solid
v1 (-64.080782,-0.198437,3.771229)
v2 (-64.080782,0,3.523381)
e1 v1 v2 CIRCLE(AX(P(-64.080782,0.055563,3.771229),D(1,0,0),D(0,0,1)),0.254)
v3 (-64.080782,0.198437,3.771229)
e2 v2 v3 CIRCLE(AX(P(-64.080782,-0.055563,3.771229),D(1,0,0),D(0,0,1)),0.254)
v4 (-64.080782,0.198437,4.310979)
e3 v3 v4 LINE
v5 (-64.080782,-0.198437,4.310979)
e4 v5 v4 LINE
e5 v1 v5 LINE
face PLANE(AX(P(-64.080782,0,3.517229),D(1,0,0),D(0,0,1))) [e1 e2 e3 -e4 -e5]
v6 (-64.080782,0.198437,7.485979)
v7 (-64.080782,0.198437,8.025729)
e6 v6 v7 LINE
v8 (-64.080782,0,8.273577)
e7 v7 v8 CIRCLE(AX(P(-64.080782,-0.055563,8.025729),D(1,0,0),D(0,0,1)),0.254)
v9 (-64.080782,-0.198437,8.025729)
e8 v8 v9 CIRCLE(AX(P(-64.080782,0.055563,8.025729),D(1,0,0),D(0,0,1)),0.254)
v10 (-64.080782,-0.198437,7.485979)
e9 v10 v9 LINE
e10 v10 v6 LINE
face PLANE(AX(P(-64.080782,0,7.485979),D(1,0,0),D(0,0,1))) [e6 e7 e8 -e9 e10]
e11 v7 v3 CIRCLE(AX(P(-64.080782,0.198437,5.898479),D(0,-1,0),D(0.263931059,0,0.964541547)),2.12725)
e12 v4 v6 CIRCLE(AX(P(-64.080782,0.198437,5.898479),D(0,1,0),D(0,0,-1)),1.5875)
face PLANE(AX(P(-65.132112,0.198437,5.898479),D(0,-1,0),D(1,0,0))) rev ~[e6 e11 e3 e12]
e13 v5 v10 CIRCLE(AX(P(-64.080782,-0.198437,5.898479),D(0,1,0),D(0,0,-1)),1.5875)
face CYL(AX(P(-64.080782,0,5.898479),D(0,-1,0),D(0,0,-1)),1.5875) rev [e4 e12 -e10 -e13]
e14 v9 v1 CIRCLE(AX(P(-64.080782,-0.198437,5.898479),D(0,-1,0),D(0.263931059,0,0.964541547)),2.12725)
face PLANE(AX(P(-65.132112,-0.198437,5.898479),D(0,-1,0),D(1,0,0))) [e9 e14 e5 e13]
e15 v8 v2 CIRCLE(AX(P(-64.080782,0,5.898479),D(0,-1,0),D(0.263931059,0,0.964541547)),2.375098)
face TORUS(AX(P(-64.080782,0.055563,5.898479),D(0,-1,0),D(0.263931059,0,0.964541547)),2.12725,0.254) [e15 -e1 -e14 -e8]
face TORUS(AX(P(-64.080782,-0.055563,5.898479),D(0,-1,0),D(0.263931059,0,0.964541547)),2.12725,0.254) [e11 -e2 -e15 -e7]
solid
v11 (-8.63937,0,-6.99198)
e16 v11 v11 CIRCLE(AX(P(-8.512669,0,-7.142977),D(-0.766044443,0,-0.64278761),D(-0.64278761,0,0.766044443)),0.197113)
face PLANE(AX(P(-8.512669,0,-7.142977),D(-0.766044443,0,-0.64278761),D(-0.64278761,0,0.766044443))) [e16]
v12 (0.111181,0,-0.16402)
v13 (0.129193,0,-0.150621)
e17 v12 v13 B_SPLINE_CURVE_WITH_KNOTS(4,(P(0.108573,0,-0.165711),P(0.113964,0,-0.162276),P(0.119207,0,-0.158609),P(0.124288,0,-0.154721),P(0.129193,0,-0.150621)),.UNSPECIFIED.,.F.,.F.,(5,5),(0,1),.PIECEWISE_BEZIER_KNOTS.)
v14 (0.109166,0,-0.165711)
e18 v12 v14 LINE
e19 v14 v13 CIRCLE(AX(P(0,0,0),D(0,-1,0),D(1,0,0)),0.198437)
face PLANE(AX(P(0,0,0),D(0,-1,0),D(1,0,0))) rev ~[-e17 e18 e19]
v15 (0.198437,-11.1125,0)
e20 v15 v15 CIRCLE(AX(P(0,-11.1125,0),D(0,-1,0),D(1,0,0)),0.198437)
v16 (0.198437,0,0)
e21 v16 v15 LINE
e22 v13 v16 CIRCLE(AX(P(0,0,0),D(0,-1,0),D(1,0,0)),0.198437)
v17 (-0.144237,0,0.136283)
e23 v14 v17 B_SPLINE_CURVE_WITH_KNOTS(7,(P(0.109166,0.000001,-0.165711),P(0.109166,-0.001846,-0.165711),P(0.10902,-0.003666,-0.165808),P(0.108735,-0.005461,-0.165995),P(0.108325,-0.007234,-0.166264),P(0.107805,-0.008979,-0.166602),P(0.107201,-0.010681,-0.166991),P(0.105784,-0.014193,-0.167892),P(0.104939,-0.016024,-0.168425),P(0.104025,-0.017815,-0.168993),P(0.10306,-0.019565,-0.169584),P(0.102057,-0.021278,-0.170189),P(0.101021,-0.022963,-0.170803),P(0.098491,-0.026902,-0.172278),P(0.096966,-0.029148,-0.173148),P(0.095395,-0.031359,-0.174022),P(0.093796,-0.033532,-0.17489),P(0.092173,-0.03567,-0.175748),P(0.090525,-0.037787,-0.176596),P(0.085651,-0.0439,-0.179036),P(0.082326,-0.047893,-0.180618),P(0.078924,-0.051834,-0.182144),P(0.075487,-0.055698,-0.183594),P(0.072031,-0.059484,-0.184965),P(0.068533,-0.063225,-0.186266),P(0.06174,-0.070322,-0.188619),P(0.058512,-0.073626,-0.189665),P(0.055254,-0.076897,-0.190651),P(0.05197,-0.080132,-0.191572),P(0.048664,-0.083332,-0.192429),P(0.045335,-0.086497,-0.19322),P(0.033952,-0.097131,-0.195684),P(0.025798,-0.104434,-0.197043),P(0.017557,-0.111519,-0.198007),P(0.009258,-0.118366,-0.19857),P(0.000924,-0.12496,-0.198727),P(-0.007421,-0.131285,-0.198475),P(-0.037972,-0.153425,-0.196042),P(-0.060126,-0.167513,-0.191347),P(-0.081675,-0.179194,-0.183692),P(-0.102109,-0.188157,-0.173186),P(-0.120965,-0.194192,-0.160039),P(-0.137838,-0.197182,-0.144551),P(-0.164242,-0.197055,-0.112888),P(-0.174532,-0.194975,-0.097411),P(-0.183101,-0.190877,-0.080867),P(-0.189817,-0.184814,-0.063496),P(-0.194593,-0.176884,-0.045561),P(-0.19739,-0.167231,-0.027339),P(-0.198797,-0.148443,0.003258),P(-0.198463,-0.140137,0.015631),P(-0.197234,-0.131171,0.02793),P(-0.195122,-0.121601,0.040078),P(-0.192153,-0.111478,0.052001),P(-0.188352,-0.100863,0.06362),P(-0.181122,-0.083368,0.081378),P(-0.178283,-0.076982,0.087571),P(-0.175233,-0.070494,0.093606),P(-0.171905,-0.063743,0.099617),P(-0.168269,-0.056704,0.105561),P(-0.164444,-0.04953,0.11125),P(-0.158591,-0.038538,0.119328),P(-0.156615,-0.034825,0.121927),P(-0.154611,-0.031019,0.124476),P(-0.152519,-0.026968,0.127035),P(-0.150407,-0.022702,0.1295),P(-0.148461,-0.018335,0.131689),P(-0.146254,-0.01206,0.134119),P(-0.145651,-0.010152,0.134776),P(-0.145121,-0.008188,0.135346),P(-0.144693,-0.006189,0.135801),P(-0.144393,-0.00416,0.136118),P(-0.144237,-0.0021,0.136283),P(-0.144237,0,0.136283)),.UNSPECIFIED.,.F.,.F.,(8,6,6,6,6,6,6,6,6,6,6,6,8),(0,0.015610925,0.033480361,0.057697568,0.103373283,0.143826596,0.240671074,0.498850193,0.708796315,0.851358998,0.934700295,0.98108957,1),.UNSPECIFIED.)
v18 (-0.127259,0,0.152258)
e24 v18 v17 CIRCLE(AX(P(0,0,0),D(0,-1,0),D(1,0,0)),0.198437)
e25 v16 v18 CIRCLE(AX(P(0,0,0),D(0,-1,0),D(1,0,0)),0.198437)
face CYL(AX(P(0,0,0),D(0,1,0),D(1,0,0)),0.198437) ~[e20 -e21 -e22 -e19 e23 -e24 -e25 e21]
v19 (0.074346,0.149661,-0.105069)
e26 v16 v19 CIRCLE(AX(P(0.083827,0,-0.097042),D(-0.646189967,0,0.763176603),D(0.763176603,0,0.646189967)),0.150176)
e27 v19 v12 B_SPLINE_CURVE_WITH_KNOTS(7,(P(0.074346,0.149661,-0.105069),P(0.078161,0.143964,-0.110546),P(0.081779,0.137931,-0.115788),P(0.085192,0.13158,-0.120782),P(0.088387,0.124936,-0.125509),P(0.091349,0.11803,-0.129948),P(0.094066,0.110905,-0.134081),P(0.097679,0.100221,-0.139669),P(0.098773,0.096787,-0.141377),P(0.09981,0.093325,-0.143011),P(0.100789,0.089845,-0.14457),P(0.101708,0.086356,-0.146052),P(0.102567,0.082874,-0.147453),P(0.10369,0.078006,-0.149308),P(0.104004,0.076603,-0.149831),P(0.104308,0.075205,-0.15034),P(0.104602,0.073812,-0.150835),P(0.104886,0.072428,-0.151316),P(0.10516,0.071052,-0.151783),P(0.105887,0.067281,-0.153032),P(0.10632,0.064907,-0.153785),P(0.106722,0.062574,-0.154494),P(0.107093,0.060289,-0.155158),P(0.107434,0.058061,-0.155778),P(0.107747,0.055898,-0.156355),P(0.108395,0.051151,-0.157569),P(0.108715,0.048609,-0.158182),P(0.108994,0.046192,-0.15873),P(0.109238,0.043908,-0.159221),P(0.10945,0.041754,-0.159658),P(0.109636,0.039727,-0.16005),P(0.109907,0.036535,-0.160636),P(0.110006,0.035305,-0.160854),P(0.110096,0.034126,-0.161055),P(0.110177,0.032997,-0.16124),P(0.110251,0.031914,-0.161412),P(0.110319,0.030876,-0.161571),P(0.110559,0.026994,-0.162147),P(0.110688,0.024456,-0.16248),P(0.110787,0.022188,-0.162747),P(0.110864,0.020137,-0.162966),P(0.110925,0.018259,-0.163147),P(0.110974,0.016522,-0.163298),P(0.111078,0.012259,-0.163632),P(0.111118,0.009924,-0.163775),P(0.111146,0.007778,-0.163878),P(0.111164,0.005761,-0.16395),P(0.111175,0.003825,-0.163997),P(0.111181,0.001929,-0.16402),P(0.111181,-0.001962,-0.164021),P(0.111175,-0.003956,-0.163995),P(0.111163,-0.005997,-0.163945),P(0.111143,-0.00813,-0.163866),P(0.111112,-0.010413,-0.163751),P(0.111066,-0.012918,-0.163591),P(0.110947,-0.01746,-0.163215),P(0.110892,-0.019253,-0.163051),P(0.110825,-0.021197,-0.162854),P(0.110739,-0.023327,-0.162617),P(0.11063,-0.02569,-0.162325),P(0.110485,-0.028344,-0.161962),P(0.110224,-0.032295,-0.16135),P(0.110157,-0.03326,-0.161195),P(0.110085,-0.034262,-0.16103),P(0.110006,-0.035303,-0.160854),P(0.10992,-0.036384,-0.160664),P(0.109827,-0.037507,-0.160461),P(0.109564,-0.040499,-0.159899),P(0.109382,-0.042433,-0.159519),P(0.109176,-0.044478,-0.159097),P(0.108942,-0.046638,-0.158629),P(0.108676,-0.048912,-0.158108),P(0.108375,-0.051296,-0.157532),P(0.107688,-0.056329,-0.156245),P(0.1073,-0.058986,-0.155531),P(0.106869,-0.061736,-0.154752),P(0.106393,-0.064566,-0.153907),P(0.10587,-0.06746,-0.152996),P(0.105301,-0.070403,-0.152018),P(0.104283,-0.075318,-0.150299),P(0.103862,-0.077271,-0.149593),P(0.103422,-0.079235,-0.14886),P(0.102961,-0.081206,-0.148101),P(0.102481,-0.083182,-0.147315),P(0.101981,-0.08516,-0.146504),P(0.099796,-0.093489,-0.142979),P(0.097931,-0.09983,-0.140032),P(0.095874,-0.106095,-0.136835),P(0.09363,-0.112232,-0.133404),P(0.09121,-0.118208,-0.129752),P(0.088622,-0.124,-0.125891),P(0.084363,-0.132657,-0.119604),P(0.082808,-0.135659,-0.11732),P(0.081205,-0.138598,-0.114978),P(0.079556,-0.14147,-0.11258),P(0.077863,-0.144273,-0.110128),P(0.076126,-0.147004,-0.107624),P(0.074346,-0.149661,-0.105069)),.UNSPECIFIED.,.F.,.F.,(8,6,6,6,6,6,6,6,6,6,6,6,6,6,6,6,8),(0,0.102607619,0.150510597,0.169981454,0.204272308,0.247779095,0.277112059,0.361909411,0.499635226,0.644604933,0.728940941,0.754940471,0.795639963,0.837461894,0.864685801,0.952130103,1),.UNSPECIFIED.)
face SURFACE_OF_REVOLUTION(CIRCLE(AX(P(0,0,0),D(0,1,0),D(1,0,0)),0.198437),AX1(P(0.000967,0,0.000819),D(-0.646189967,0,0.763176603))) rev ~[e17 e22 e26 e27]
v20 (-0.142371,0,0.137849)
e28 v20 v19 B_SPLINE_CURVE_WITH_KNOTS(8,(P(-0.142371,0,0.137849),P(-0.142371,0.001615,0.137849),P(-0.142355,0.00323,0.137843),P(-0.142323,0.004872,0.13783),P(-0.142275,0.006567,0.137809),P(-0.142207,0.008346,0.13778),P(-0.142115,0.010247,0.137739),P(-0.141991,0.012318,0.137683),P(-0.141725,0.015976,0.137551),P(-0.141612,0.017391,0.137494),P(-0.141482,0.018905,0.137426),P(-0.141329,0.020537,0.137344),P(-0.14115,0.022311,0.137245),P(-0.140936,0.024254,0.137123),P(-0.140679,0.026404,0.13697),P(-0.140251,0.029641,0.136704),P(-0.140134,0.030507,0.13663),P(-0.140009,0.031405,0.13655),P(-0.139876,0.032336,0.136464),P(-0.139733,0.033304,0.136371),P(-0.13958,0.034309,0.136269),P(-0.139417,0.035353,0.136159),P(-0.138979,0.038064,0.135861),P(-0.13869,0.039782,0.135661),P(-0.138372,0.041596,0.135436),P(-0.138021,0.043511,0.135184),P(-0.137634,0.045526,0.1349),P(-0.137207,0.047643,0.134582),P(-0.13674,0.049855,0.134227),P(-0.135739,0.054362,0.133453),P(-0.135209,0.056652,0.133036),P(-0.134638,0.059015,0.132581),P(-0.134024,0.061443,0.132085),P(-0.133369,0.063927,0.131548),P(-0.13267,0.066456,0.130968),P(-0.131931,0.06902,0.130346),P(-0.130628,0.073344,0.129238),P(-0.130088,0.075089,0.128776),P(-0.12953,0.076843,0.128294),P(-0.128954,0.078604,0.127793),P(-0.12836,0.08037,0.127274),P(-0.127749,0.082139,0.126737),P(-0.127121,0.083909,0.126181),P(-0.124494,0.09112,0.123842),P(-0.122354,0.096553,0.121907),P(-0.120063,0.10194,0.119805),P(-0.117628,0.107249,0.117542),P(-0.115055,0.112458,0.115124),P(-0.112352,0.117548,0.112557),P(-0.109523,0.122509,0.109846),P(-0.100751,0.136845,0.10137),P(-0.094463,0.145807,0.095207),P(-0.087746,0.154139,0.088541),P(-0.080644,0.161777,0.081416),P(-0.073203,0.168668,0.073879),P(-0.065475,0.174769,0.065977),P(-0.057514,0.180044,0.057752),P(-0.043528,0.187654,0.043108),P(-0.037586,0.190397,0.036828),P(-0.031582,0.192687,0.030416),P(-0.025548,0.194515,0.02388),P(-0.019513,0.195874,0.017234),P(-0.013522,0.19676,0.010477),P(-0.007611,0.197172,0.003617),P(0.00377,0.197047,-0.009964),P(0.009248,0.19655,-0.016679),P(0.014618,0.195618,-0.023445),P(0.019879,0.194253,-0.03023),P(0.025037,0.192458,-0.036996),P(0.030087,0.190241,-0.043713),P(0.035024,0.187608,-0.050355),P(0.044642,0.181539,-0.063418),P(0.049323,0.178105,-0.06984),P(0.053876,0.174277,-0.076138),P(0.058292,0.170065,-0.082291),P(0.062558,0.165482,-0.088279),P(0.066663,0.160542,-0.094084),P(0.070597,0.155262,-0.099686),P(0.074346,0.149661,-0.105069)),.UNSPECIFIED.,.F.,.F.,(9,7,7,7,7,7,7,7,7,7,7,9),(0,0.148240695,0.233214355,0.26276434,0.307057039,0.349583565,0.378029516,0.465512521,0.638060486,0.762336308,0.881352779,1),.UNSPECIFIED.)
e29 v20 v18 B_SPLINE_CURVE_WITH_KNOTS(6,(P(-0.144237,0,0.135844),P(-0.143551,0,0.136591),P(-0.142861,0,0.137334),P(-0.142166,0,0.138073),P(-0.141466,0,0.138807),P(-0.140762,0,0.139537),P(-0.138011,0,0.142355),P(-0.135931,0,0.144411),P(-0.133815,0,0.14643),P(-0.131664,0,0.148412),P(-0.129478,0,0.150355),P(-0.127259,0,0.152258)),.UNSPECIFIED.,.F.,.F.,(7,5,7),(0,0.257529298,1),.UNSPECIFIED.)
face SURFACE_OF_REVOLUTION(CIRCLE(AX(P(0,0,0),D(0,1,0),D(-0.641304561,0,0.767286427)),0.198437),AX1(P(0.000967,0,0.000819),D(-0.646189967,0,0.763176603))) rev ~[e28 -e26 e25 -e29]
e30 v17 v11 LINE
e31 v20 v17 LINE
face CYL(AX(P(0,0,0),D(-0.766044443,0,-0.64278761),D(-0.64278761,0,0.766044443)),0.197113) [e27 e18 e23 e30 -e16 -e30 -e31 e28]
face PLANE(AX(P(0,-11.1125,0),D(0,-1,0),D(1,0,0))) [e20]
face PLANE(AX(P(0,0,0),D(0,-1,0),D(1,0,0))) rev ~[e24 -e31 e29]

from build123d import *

# Parameters (mm, degrees)
F0_R          = 0.1984375
F1_DEPTH      = 11.1125
F6_DEPTH      = 0.1984375
F6_DEPTH_BACK = 0.1984375
F7_T2_ANGLE   = 210.6068917121
F7_T4_ANGLE   = 210.6068917121


# Not quite as in the source:
# - a fillet or chamfer that OpenCascade refuses, or shapes differently, is made with other operations: its cross-section is extruded or revolved along the edge and cut away or added


with BuildPart() as f1:
    # F0 (on Front) → F1 (new body)
    with BuildSketch(Plane.XZ):
        Circle(F0_R)
    extrude(amount=F1_DEPTH)

    # F2 (on Front) → F3 (revolve)
    with BuildSketch(Plane.XZ):
        Polygon((-8.5126688742, -7.1429773126), (0, 0), (-0.1267016231, 0.1509971145), (-8.6393704972, -6.9919801982), align=None)
    revolve(axis=Axis((-4.2563344371, 0, -3.5714886563), (-0.7660444431, 0, -0.6427876097)))

    # F4 (on face) → F5 (revolve)
    with BuildSketch(Plane(origin=(0, 0, 0), x_dir=(-1, 0, 0), z_dir=(0, 1, 0))):
        with BuildLine():
            ThreePointArc((-0.1984375, 0), (-0.1802970974, -0.0828878645), (-0.129192543, -0.1506211414))
            Line((-0.129192543, -0.1506211414), (0.1272588737, 0.1522584003))
            ThreePointArc((0.1272588737, 0.1522584003), (-0.0840372199, 0.1797642542), (-0.1984375, 0))
        make_face()
    revolve(axis=Axis((0.0009668347, 0, 0.0008186295), (-0.6461899668, 0, 0.7631766027)))


with BuildPart() as f6:
    # F2 (on Front) → F6 (new body, two sides)
    with BuildSketch(Plane.XZ) as f6_sk:
        with BuildLine():
            Line((-64.0807822347, 7.4859789066), (-64.0807822347, 8.2797289066))
            ThreePointArc((-64.0807822347, 8.2797289066), (-66.4620322347, 5.8984789066), (-64.0807822347, 3.5172289066))
            Line((-64.0807822347, 3.5172289066), (-64.0807822347, 4.3109789066))
            ThreePointArc((-64.0807822347, 4.3109789066), (-65.6682822347, 5.8984789066), (-64.0807822347, 7.4859789066))
        make_face()
    extrude(amount=F6_DEPTH)
    extrude(f6_sk.sketch, amount=-F6_DEPTH_BACK)

    # F7: fillet of radius 0.254 on 2 edges, made by hand

    # F7_s1 → F7_t2 (revolve, cut)
    with BuildSketch(Plane(origin=(-61.1185306696, 0, 16.7240888712), x_dir=(0, 1, 0), z_dir=(0.964541547, 0, -0.2639310595))):
        with BuildLine():
            ThreePointArc((0.0555625, -8.8423307762), (-0.1240426224, -8.9167256538), (-0.1984375, -9.0963307762))
            Line((-0.1984375, -9.0963307762), (-0.1984375, -8.8423307762))
            Line((-0.1984375, -8.8423307762), (0.0555625, -8.8423307762))
        make_face()
    revolve(axis=Axis((-64.0807822347, -0.1984375, 5.8984789066), (0, -1, 0)), revolution_arc=F7_T2_ANGLE, mode=Mode.SUBTRACT)

    # F7_s3 → F7_t4 (revolve, cut)
    with BuildSketch(Plane(origin=(-61.1185306696, 0, 16.7240888712), x_dir=(0, 1, 0), z_dir=(0.964541547, 0, -0.2639310595))):
        with BuildLine():
            ThreePointArc((0.1984375, -9.0963307762), (0.1240426224, -8.9167256538), (-0.0555625, -8.8423307762))
            Line((-0.0555625, -8.8423307762), (0.1984375, -8.8423307762))
            Line((0.1984375, -8.8423307762), (0.1984375, -9.0963307762))
        make_face()
    revolve(axis=Axis((-64.0807822347, 0.1984375, 5.8984789066), (0, -1, 0)), revolution_arc=F7_T4_ANGLE, mode=Mode.SUBTRACT)


solid = Compound([f1.part, f6.part])
